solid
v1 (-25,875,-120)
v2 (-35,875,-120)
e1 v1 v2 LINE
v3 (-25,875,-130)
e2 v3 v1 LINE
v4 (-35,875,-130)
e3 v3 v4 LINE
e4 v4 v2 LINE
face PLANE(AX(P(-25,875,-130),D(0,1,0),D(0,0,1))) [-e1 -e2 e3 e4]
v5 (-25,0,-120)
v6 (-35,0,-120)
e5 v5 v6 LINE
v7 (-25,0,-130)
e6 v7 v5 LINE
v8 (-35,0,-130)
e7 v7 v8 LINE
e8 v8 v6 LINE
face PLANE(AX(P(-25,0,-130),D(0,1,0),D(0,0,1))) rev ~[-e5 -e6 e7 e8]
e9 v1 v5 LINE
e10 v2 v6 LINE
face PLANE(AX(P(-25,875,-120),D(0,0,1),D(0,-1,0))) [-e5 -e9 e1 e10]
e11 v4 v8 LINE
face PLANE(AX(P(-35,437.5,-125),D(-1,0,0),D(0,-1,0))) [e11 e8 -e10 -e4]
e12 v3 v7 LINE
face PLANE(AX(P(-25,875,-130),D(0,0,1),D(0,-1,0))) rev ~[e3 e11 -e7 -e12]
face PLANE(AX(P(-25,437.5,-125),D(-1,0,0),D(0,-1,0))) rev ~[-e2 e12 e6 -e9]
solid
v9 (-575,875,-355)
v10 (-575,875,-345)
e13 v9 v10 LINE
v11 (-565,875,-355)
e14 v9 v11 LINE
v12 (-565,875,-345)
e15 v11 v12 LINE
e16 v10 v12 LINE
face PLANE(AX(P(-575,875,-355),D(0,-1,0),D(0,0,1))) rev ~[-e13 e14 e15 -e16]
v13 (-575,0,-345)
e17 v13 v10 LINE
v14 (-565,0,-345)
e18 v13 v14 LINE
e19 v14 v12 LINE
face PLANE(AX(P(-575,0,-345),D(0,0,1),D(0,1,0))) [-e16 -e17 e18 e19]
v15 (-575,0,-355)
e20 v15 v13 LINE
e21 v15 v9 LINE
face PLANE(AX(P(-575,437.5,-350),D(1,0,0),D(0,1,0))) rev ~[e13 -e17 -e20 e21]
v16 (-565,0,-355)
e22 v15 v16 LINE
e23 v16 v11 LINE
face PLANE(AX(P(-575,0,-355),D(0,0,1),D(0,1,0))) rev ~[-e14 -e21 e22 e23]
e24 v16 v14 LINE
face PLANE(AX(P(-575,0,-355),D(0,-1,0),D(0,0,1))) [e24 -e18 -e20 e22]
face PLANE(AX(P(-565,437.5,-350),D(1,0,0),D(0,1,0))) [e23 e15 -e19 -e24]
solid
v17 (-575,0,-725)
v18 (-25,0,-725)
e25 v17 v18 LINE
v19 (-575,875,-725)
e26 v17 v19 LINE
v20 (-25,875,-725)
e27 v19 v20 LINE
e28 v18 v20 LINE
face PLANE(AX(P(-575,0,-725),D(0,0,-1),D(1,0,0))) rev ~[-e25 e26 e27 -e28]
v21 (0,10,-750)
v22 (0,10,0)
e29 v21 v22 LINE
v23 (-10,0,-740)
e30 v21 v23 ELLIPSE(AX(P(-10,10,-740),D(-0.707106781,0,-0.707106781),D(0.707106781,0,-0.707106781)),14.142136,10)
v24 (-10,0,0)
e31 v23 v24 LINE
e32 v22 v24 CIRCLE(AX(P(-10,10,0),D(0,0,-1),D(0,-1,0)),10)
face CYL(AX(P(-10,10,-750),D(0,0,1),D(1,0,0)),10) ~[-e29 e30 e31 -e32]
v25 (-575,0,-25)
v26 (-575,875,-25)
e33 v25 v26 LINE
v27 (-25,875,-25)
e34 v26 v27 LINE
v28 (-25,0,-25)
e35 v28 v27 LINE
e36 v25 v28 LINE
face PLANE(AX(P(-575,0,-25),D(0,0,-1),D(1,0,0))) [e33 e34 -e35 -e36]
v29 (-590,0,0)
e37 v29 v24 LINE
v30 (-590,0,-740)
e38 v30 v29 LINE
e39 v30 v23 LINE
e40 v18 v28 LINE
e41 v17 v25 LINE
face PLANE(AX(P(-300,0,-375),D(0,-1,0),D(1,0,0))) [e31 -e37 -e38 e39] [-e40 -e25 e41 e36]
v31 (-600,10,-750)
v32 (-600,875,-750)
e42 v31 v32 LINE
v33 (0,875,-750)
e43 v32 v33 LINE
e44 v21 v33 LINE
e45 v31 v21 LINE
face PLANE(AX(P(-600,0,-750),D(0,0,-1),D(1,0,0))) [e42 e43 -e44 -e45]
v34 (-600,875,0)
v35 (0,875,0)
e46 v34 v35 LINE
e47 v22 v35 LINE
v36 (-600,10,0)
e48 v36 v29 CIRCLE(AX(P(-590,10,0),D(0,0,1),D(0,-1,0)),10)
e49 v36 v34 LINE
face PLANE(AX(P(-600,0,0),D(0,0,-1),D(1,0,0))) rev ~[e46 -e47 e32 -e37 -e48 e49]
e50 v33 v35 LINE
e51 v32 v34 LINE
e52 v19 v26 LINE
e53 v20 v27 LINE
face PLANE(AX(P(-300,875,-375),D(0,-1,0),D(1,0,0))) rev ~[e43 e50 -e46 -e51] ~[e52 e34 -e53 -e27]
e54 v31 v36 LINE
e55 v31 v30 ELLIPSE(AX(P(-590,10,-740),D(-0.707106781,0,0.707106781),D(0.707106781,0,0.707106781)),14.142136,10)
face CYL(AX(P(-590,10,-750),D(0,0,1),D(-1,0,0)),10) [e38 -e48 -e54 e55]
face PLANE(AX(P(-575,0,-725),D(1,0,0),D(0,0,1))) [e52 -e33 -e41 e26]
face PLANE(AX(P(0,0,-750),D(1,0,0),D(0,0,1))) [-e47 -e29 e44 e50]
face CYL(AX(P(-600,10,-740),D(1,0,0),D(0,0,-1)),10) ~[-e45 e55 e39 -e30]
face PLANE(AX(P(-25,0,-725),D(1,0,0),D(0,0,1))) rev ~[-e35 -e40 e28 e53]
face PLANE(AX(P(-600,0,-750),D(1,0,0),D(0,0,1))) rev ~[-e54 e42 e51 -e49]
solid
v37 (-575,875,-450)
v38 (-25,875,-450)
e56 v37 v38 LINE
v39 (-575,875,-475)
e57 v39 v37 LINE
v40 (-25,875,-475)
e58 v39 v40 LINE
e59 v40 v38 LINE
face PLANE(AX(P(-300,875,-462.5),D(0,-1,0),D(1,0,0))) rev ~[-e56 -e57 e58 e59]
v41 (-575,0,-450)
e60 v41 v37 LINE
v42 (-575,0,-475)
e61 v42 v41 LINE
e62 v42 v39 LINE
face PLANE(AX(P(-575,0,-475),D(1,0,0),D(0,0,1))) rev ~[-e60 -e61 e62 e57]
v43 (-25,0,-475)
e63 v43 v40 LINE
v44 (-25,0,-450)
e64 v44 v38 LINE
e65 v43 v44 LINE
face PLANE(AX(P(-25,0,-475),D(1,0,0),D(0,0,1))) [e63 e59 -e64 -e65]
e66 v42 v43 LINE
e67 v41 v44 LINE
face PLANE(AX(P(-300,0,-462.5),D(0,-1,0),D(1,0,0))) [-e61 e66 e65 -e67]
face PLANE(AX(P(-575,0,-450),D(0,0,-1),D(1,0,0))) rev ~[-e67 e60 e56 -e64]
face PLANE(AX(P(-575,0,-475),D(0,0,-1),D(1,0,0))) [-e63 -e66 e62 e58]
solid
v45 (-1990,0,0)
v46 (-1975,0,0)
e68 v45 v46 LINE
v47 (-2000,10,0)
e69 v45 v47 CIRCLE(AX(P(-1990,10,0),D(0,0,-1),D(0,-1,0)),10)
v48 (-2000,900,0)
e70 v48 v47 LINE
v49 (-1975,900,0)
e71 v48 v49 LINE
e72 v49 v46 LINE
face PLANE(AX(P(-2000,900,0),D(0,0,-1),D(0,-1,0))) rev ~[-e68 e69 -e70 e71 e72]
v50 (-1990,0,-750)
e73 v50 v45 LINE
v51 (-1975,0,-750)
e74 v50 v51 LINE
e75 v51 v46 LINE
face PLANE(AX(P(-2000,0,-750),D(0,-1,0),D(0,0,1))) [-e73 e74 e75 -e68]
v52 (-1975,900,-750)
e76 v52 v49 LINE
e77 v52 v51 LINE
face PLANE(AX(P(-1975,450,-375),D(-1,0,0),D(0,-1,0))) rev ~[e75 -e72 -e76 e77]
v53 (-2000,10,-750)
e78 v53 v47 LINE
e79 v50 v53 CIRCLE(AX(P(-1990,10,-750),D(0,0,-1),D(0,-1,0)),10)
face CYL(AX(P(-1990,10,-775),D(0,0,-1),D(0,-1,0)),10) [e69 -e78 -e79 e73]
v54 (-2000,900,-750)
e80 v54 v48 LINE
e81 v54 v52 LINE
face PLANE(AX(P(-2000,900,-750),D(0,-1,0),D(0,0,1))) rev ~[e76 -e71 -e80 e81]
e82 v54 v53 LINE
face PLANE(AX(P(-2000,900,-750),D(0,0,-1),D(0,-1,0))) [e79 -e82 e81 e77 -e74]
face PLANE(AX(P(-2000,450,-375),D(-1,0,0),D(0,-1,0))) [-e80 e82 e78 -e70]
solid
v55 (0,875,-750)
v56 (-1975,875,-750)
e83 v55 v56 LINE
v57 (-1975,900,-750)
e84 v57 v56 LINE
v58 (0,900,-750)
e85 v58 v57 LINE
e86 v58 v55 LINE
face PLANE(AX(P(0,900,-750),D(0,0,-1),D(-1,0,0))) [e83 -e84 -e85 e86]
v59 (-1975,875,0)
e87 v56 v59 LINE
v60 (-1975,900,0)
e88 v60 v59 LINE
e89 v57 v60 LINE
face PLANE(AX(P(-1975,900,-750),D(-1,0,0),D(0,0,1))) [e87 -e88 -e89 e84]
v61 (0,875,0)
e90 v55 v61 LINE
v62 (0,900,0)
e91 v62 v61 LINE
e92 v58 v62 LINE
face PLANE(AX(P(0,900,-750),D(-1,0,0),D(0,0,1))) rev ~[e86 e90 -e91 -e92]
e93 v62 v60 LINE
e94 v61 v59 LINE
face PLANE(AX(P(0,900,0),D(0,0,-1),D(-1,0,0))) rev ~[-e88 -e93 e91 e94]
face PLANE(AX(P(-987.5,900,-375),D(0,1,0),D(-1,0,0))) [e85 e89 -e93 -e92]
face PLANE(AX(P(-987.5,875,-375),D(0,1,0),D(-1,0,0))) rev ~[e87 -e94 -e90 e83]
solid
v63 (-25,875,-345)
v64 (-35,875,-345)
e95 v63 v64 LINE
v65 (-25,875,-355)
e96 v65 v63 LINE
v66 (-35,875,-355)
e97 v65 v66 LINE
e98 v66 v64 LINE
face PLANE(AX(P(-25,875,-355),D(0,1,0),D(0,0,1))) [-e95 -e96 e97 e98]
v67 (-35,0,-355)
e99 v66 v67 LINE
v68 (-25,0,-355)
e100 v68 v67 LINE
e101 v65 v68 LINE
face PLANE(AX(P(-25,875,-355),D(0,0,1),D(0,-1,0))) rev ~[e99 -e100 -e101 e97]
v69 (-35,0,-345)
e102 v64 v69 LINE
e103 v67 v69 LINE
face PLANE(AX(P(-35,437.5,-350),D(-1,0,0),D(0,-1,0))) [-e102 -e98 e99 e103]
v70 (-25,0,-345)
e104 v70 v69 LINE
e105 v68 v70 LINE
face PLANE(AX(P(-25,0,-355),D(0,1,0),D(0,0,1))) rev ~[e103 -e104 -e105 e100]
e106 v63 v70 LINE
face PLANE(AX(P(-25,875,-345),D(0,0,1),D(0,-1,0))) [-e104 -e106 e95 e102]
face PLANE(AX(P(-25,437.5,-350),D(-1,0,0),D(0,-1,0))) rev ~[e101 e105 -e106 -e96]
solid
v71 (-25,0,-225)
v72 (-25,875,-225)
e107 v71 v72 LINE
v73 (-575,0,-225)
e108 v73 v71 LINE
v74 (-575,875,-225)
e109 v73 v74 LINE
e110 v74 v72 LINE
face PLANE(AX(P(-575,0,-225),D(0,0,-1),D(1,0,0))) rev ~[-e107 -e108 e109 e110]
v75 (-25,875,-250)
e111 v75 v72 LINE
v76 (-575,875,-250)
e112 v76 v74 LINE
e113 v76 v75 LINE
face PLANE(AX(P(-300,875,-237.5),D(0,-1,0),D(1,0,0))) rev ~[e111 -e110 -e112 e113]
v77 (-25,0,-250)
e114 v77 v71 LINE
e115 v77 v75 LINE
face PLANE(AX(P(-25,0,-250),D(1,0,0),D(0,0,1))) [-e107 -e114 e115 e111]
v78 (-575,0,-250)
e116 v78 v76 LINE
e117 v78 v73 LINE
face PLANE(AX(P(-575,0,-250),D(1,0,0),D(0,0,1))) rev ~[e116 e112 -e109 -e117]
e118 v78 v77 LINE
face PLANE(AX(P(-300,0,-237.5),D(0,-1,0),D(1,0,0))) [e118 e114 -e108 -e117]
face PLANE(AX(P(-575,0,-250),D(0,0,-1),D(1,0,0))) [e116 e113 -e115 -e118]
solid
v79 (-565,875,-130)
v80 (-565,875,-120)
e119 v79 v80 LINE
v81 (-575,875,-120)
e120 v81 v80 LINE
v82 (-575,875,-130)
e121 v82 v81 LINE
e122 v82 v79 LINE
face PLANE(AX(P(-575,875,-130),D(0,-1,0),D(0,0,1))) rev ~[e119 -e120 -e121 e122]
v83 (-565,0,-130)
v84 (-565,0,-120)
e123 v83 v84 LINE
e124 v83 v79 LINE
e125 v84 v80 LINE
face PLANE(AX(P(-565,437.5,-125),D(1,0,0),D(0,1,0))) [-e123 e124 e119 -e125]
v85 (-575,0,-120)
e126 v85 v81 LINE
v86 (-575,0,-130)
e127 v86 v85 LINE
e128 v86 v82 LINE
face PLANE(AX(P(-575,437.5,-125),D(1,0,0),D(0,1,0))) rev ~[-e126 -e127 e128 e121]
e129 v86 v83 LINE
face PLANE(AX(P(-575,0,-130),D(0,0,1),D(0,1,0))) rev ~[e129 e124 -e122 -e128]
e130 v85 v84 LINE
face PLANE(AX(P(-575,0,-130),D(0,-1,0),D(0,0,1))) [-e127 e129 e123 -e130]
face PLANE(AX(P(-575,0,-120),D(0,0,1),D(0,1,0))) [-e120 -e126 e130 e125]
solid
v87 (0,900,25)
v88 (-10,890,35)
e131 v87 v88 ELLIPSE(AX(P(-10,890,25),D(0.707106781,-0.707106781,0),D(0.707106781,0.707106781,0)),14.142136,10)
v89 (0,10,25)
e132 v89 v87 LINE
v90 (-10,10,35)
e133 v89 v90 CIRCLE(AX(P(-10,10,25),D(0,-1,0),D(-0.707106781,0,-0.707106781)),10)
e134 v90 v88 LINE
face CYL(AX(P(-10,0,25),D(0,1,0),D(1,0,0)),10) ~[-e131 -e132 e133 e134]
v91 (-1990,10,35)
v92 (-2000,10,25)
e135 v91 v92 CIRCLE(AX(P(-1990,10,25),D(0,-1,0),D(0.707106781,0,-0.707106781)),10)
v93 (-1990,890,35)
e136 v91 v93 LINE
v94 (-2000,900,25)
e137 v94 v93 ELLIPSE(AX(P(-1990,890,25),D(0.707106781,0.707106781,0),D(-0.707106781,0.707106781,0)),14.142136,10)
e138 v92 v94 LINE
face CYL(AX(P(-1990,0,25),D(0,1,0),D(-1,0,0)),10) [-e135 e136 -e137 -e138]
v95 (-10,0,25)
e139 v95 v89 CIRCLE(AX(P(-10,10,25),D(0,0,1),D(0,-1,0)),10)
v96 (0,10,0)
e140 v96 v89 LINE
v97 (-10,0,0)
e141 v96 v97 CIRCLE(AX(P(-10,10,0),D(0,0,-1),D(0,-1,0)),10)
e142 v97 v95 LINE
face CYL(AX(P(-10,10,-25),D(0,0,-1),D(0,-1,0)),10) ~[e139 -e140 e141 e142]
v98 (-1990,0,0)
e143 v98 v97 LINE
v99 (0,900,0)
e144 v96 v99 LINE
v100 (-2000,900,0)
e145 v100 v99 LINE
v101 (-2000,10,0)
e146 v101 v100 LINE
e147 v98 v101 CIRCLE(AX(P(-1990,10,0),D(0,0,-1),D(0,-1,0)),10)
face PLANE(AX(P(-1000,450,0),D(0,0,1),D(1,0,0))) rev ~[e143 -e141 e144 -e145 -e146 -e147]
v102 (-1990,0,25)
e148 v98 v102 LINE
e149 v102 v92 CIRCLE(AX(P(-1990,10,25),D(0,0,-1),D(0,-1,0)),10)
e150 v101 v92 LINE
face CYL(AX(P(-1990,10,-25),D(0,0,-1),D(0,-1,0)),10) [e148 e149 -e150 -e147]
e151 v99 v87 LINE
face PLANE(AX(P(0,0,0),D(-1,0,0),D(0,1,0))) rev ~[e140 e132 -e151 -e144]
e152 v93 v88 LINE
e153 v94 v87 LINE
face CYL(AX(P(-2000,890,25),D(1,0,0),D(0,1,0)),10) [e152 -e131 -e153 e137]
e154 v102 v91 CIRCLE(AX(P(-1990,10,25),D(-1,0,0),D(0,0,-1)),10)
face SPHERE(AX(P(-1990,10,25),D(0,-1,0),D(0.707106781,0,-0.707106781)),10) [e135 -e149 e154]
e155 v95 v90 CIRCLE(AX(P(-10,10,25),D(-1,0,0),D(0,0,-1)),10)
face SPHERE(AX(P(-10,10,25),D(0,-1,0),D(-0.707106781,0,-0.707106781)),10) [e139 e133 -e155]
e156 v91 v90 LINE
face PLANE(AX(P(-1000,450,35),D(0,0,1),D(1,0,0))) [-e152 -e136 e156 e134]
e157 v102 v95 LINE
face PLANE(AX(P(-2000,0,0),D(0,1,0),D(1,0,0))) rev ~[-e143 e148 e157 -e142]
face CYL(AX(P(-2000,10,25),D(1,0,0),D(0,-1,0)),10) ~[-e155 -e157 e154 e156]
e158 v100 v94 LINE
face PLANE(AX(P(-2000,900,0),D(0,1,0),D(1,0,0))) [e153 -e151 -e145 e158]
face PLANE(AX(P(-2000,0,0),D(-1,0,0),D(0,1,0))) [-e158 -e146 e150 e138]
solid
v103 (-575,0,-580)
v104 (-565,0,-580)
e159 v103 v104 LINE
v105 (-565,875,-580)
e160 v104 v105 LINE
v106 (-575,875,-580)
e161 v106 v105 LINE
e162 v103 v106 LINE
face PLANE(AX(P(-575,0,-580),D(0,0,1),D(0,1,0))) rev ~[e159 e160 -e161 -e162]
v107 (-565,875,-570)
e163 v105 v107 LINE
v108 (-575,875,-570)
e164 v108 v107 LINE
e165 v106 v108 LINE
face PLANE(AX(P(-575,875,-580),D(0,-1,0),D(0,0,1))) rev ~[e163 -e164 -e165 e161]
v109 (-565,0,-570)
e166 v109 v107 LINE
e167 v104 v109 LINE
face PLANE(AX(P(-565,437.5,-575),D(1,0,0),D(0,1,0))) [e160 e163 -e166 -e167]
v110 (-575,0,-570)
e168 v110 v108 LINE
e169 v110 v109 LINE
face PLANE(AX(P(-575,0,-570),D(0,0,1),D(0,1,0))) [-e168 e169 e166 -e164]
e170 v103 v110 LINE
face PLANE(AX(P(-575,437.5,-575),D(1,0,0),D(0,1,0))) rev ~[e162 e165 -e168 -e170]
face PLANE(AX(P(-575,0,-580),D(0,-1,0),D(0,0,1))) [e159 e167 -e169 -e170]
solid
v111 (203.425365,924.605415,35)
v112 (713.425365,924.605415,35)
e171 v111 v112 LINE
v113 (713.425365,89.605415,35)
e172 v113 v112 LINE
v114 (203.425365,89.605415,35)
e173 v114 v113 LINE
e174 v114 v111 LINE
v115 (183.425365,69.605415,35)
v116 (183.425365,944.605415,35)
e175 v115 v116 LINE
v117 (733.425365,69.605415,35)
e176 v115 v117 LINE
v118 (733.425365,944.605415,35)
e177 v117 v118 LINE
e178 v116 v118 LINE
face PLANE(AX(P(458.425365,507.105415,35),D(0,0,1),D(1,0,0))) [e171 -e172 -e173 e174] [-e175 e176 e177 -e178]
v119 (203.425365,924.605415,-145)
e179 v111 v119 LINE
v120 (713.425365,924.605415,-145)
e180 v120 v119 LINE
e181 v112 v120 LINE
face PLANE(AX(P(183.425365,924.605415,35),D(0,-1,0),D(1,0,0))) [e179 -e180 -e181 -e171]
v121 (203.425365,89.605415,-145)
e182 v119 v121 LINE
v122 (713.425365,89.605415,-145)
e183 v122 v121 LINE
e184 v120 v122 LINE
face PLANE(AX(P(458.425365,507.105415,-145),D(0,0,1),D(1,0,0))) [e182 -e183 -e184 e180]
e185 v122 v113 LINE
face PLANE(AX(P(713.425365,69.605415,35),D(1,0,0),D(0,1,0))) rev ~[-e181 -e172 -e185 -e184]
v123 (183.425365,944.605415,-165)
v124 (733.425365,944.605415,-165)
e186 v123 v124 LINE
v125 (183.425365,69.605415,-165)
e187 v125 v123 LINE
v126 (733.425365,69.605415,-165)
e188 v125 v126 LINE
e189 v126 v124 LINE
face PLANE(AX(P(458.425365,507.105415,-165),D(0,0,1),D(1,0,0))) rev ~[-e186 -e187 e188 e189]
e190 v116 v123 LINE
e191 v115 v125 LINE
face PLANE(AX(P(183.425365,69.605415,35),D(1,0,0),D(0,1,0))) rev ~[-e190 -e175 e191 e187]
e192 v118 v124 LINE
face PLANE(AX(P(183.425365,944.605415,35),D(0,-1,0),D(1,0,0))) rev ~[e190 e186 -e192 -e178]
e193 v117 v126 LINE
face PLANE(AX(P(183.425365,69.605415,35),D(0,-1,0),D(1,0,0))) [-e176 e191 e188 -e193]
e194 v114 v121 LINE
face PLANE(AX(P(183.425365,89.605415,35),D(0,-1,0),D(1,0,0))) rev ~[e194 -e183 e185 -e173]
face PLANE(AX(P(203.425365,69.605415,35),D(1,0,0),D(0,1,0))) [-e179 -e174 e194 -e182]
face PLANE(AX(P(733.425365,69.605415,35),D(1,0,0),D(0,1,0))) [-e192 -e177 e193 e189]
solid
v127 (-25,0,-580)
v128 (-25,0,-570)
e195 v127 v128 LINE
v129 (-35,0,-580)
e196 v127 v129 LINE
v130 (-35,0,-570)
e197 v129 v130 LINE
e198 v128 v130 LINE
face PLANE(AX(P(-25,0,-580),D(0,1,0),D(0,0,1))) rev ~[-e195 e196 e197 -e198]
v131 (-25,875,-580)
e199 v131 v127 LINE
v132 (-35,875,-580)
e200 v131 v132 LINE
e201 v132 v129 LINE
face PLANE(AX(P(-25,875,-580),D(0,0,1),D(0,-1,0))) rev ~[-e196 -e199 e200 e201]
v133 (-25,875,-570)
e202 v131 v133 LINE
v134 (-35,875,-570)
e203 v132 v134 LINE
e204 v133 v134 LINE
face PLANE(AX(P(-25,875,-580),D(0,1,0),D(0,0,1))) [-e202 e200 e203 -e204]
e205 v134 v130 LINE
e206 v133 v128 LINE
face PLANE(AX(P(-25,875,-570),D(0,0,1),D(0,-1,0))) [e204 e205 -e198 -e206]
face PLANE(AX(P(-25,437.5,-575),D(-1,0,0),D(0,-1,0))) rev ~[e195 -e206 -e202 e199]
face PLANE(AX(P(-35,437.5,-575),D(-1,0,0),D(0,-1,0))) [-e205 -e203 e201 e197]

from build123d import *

# Parameters (mm, degrees)
F0_W           = 2000
F0_H           = 900
F1_DEPTH       = 35
F2_R           = 10
F3_W           = 600
F3_H           = 750
F3_W_2         = 550
F3_H_2         = 700
F4_DEPTH       = 875
F5_R           = 10
F6_W           = 900
F6_H           = 750
F7_DEPTH       = 25
F8_W           = 1975
F8_H           = 750
F9_DEPTH       = 25
F10_T1_DEPTH   = 50
F10_S5_W       = 10
F10_S5_H       = 10
F10_T6_DEPTH   = 10
F10_2_T1_DEPTH = 800
F11_T1_DEPTH   = 50
F11_S5_W       = 10
F11_S5_H       = 10
F11_T6_DEPTH   = 10
F12_W          = 550
F12_H          = 25
F13_DEPTH      = 875
F14_W          = 550
F14_H          = 25
F15_DEPTH      = 875
F16_W          = 875
F16_H          = 10
F17_DEPTH      = 10
F18_W          = 875
F18_H          = 10
F19_DEPTH      = 10
F20_W          = 550
F20_H          = 875
F21_DEPTH      = 200
F22_T          = -20


# Not quite as in the source:
# - a fillet or chamfer that OpenCascade refuses, or shapes differently, is made with other operations: its cross-section is extruded or revolved along the edge and cut away or added


with BuildPart() as f1:
    # F0 (on Top) → F1 (new body)
    with BuildSketch(Plane.XY):
        with Locations((-1000, 450)):
            Rectangle(F0_W, F0_H)
    extrude(amount=F1_DEPTH)

    # F2
    f2_edges = [f1.edges().sort_by_distance(p)[0] for p in [
        (-2000, 450, 35),
        (-1000, 900, 35),
        (0, 450, 35),
        (-1000, 0, 35),
    ]]
    fillet(f2_edges, radius=F2_R)

    # F10: fillet of radius 10 on 1 edges, made by hand

    # F10_s2 → F10_t1 (cut)
    with BuildSketch(Plane.XY.offset(-25)):
        with BuildLine():
            ThreePointArc((-1990, 0), (-1997.0710678119, 2.9289321881), (-2000, 10))
            Line((-2000, 10), (-2000, 0))
            Line((-2000, 0), (-1990, 0))
        make_face()
    extrude(amount=F10_T1_DEPTH, mode=Mode.SUBTRACT)


with BuildPart() as f4:
    # F3 (on Front) → F4 (new body)
    with BuildSketch(Plane.XZ):
        with Locations((-300, -375)):
            Rectangle(F3_W, F3_H)
        with Locations((-300, -375)):
            Rectangle(F3_W_2, F3_H_2, mode=Mode.SUBTRACT)
    extrude(amount=-F4_DEPTH)

    # F5
    f5_edges = [f4.edges().sort_by_distance(p)[0] for p in [
        (-600, 0, -375),
        (-300, 0, -750),
        (0, 0, -375),
    ]]
    fillet(f5_edges, radius=F5_R)


with BuildPart() as f7:
    # F6 (on face) → F7 (new body)
    with BuildSketch(Plane(origin=(-2000, 0, 0), x_dir=(0, -1, 0), z_dir=(-1, 0, 0))):
        with Locations((-450, -375)):
            Rectangle(F6_W, F6_H)
    extrude(amount=-F7_DEPTH)

    # F10#2: fillet of radius 10 on 1 edges, made by hand

    # F10_2_s2 → F10_2_t1 (cut)
    with BuildSketch(Plane.XY.offset(-775)):
        with BuildLine():
            ThreePointArc((-1990, 0), (-1997.0710678119, 2.9289321881), (-2000, 10))
            Line((-2000, 10), (-2000, 0))
            Line((-2000, 0), (-1990, 0))
        make_face()
    extrude(amount=F10_2_T1_DEPTH, mode=Mode.SUBTRACT)


with BuildPart() as f9:
    # F8 (on face) → F9 (new body)
    with BuildSketch(Plane(origin=(0, 900, 0), x_dir=(-1, 0, 0), z_dir=(0, 1, 0))):
        with Locations((987.5, -375)):
            Rectangle(F8_W, F8_H)
    extrude(amount=-F9_DEPTH)


with BuildPart() as f10_tool4:
    # F10_s5 → F10_t6 (new body)
    with BuildSketch(Plane.XZ.offset(-10)):
        with Locations((-1995, 30)):
            Rectangle(F10_S5_W, F10_S5_H)
    extrude(amount=F10_T6_DEPTH)

    # F10_s7 → F10_t8 (revolve, cut)
    with BuildSketch(Plane(origin=(-1990, 10, 25), x_dir=(0.7071067812, 0, -0.7071067812), z_dir=(-0.7071067812, 0, -0.7071067812))):
        with BuildLine():
            ThreePointArc((0, -10), (10, 0), (0, 10))
            Line((0, 10), (0, -10))
        make_face()
    revolve(axis=Axis((-1990, 10, 25), (0, -1, 0)), mode=Mode.SUBTRACT)


with BuildPart() as f1_1:
    add(f1.part)

    # F10_t3: cut F10_tool4
    add(f10_tool4.part, mode=Mode.SUBTRACT)

    # F11: fillet of radius 10 on 1 edges, made by hand

    # F11_s2 → F11_t1 (cut)
    with BuildSketch(Plane.XY.offset(-25)):
        with BuildLine():
            ThreePointArc((-10, 0), (-2.9289321881, 2.9289321881), (0, 10))
            Line((0, 10), (0, 0))
            Line((0, 0), (-10, 0))
        make_face()
    extrude(amount=F11_T1_DEPTH, mode=Mode.SUBTRACT)


with BuildPart() as f11_tool4:
    # F11_s5 → F11_t6 (new body)
    with BuildSketch(Plane.XZ.offset(-10)):
        with Locations((-5, 30)):
            Rectangle(F11_S5_W, F11_S5_H)
    extrude(amount=F11_T6_DEPTH)

    # F11_s7 → F11_t8 (revolve, cut)
    with BuildSketch(Plane(origin=(-10, 10, 25), x_dir=(-0.7071067812, 0, -0.7071067812), z_dir=(-0.7071067812, 0, 0.7071067812))):
        with BuildLine():
            ThreePointArc((0, -10), (10, 0), (0, 10))
            Line((0, 10), (0, -10))
        make_face()
    revolve(axis=Axis((-10, 10, 25), (0, -1, 0)), mode=Mode.SUBTRACT)


with BuildPart() as f1_2:
    add(f1_1.part)

    # F11_t3: cut F11_tool4
    add(f11_tool4.part, mode=Mode.SUBTRACT)


with BuildPart() as f13:
    # F12 (on face) → F13 (new body)
    with BuildSketch(Plane.XZ):
        with Locations((-300, -237.5)):
            Rectangle(F12_W, F12_H)
    extrude(amount=-F13_DEPTH)


with BuildPart() as f15:
    # F14 (on face) → F15 (new body)
    with BuildSketch(Plane.XZ):
        with Locations((-300, -462.5)):
            Rectangle(F14_W, F14_H)
    extrude(amount=-F15_DEPTH)


with BuildPart() as f17:
    # F16 (on face) → F17 (new body)
    with BuildSketch(Plane.YZ.offset(-575)):
        with Locations((437.5, -125)):
            Rectangle(F16_W, F16_H)
    extrude(amount=F17_DEPTH)


with BuildPart() as f17b:
    # F16 (on face) → F17, piece 2 (new body)
    with BuildSketch(Plane.YZ.offset(-575)):
        with Locations((437.5, -350)):
            Rectangle(F16_W, F16_H)
    extrude(amount=F17_DEPTH)


with BuildPart() as f17c:
    # F16 (on face) → F17, piece 3 (new body)
    with BuildSketch(Plane.YZ.offset(-575)):
        with Locations((437.5, -575)):
            Rectangle(F16_W, F16_H)
    extrude(amount=F17_DEPTH)


with BuildPart() as f19:
    # F18 (on face) → F19 (new body)
    with BuildSketch(Plane(origin=(-25, 0, 0), x_dir=(0, -1, 0), z_dir=(-1, 0, 0))):
        with Locations((-437.5, -125)):
            Rectangle(F18_W, F18_H)
    extrude(amount=F19_DEPTH)


with BuildPart() as f19b:
    # F18 (on face) → F19, piece 2 (new body)
    with BuildSketch(Plane(origin=(-25, 0, 0), x_dir=(0, -1, 0), z_dir=(-1, 0, 0))):
        with Locations((-437.5, -350)):
            Rectangle(F18_W, F18_H)
    extrude(amount=F19_DEPTH)


with BuildPart() as f19c:
    # F18 (on face) → F19, piece 3 (new body)
    with BuildSketch(Plane(origin=(-25, 0, 0), x_dir=(0, -1, 0), z_dir=(-1, 0, 0))):
        with Locations((-437.5, -575)):
            Rectangle(F18_W, F18_H)
    extrude(amount=F19_DEPTH)


with BuildPart() as f21:
    # F20 (on face) → F21 (new body)
    with BuildSketch(Plane.XY.offset(35)):
        with Locations((458.4253653884, 507.1054147508)):
            Rectangle(F20_W, F20_H)
    extrude(amount=-F21_DEPTH)

    # F22
    f22_openings = [f21.faces().sort_by_distance(p)[0] for p in [
        (458.425365, 507.105415, 35),
    ]]
    offset(amount=F22_T, openings=f22_openings)


solid = Compound([f4.part, f7.part, f9.part, f1_2.part, f13.part, f15.part, f17.part, f17b.part, f17c.part, f19.part, f19b.part, f19c.part, f21.part])
